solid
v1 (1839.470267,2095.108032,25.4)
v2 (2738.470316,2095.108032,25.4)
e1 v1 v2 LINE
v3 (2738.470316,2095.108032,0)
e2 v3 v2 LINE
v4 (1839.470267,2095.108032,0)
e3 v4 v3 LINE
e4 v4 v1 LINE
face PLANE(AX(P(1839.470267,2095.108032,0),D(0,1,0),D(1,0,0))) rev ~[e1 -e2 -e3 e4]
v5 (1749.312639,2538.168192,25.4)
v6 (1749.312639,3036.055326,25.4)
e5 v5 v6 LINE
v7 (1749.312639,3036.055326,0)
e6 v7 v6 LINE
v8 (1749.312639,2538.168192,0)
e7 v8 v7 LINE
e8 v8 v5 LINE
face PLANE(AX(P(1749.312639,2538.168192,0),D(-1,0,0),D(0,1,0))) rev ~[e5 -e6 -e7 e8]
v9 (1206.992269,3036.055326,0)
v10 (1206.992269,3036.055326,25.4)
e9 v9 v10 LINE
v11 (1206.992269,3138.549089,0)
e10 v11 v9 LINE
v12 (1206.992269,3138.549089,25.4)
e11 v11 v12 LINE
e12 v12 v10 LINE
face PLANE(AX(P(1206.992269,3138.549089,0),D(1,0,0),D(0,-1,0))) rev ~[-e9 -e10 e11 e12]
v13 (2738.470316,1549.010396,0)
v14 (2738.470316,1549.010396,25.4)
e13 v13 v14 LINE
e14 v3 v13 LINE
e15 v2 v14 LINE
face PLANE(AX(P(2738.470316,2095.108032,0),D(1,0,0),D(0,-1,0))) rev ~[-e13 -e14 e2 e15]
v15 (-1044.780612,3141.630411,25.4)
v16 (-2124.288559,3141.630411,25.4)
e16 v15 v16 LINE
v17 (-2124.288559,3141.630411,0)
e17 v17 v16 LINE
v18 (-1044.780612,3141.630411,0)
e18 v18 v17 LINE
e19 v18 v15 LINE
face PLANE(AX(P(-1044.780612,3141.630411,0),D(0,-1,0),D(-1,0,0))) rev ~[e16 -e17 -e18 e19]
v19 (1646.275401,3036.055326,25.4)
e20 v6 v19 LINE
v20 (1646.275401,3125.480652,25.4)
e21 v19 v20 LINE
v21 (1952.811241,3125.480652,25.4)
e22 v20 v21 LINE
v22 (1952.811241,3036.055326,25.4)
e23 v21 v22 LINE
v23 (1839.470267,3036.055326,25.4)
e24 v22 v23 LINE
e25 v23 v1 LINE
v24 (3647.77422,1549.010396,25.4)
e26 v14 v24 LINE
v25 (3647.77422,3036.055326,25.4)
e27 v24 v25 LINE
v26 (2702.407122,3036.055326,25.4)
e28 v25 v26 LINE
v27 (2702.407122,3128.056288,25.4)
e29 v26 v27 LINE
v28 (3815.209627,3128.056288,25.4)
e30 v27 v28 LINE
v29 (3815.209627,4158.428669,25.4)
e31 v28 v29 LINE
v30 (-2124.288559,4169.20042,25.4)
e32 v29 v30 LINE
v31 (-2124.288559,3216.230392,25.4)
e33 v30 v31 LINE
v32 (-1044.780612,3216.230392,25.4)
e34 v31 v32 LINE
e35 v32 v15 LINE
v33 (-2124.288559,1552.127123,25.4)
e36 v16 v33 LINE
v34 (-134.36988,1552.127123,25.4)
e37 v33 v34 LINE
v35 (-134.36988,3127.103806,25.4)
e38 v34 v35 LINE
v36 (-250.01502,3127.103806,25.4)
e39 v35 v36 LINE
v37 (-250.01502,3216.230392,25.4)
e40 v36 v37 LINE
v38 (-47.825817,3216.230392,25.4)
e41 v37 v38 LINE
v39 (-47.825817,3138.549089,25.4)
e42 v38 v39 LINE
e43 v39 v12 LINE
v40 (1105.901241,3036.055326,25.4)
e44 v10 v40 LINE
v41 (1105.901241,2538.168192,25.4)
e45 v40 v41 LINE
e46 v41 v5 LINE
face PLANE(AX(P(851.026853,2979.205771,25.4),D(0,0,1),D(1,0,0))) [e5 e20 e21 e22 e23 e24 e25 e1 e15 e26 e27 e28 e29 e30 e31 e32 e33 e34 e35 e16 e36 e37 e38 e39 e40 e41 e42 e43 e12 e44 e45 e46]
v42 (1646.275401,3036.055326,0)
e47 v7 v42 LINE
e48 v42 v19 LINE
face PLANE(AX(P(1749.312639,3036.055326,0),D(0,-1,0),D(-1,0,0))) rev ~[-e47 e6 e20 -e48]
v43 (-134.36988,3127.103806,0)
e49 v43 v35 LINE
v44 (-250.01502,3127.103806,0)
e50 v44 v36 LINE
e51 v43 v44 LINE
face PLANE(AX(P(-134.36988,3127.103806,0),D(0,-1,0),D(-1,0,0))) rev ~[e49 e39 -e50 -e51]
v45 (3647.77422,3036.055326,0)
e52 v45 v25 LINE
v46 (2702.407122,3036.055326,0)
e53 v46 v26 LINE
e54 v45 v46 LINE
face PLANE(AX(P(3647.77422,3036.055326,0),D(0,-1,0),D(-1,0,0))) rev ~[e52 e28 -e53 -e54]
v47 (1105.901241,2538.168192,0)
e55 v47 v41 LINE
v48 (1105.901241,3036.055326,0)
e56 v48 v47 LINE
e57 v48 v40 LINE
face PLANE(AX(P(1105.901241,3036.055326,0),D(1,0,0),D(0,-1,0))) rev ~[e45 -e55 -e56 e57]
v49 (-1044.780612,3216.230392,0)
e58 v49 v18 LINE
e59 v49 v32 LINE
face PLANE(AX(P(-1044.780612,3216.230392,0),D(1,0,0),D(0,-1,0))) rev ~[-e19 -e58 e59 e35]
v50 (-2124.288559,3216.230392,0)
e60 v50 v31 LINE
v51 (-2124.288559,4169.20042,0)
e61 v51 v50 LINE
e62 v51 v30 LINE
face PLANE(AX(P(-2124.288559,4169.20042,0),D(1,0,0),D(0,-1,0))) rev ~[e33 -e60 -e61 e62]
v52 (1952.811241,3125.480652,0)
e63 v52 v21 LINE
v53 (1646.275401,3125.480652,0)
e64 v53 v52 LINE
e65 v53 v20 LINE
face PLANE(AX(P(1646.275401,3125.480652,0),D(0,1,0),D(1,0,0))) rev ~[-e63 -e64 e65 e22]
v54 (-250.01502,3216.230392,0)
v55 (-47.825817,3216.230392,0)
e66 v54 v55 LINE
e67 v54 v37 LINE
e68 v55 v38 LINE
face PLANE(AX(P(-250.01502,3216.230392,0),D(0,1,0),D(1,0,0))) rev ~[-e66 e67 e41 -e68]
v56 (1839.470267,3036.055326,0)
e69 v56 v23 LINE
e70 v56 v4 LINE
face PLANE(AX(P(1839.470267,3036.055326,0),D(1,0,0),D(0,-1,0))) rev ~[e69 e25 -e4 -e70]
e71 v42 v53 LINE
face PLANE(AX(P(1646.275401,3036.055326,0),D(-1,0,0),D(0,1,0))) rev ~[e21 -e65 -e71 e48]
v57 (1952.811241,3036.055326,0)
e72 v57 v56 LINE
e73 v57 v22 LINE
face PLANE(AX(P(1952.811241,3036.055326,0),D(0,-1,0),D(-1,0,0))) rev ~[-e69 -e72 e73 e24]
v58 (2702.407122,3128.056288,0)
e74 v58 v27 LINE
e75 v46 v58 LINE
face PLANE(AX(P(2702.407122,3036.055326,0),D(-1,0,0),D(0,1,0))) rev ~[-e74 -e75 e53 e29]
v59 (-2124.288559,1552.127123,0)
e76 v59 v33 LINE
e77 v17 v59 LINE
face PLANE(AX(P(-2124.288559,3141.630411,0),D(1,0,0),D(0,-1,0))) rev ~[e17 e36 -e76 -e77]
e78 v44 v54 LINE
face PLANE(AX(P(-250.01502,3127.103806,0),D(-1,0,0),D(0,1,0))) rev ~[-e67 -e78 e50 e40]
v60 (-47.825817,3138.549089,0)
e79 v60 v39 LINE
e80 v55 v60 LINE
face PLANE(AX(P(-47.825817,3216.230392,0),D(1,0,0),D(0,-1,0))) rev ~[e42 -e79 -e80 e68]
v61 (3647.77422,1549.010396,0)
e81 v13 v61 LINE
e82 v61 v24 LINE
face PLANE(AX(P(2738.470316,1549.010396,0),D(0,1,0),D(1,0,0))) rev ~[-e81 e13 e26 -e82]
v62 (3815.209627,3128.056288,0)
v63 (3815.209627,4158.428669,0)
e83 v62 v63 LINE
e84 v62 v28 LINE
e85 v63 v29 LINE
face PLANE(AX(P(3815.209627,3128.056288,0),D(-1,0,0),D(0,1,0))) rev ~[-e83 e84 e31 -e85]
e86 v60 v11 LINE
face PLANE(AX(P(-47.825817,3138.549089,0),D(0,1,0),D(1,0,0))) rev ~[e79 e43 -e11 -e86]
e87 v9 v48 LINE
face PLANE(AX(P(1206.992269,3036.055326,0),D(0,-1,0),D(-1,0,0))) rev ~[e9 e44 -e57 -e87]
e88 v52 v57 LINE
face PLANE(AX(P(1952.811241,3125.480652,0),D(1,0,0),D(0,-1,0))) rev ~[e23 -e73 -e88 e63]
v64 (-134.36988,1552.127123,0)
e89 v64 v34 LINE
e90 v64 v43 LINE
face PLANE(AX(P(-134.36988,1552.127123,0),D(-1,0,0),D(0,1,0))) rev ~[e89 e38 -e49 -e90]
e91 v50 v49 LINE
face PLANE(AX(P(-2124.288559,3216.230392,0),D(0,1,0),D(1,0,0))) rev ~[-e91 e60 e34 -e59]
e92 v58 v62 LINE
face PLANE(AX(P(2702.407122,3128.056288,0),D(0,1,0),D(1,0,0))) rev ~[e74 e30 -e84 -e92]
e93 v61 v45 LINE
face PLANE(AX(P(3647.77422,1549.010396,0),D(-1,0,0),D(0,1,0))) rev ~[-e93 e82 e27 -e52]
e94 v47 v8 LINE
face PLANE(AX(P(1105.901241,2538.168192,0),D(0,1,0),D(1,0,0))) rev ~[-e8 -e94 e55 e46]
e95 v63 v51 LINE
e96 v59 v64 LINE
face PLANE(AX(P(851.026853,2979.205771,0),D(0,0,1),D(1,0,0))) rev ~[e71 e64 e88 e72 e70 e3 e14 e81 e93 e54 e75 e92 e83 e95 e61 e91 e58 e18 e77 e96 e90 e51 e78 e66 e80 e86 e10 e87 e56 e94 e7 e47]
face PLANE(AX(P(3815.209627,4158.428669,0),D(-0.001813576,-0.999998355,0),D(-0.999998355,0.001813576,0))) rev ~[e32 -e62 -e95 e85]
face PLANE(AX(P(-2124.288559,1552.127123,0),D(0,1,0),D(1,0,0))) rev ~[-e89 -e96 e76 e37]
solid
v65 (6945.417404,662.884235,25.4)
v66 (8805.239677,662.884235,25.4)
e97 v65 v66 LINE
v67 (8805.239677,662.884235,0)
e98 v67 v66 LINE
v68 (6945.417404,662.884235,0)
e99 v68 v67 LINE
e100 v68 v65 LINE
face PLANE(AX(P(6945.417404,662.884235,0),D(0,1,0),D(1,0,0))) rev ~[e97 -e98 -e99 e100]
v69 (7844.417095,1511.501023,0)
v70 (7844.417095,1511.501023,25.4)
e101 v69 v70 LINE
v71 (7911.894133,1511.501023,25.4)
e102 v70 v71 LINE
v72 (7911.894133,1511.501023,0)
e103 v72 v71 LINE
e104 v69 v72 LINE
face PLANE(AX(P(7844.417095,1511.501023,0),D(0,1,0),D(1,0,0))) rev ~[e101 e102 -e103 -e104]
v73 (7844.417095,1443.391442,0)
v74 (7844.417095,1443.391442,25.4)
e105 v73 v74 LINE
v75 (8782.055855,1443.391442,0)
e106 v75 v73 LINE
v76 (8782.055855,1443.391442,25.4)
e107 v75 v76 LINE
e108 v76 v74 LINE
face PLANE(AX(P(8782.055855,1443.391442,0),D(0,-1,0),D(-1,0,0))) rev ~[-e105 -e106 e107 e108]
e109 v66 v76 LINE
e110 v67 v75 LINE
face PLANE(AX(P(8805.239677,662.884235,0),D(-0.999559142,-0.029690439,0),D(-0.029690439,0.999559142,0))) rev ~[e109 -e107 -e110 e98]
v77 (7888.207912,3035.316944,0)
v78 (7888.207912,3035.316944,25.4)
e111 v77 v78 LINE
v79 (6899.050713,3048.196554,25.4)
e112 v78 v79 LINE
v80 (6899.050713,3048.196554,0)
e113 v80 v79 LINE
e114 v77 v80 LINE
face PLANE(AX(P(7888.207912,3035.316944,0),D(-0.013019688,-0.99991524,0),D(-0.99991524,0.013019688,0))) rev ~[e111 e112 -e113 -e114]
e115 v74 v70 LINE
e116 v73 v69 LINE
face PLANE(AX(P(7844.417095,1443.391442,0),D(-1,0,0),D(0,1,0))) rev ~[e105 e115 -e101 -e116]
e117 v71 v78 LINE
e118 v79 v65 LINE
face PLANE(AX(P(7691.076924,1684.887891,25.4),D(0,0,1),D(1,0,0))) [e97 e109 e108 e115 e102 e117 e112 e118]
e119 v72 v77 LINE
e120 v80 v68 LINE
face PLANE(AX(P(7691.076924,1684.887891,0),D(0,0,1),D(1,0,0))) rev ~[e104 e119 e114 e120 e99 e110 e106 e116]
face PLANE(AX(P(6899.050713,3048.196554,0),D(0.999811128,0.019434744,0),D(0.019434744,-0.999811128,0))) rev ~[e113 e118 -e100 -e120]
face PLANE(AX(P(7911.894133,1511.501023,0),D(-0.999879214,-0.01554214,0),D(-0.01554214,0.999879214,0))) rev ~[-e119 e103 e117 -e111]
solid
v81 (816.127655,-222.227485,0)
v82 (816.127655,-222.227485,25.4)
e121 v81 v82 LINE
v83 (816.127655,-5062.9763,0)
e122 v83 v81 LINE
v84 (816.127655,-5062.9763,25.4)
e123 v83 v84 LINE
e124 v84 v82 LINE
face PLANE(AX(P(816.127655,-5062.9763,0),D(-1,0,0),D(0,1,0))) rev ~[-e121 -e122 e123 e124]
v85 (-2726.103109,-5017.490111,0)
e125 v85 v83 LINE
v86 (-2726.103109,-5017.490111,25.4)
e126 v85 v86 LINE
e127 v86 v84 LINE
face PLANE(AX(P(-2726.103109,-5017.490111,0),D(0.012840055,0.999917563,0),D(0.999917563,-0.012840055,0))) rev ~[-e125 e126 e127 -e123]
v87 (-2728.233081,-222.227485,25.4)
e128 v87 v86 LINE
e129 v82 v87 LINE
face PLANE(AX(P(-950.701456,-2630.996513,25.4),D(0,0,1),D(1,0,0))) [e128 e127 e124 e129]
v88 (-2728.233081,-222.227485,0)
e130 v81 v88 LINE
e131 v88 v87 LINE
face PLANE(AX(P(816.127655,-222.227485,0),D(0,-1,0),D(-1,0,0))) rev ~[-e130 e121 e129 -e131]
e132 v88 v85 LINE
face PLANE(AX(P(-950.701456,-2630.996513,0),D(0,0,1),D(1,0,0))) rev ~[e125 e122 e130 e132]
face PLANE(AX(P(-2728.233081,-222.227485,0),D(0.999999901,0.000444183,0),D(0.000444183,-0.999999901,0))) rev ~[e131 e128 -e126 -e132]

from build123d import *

# Parameters (mm, degrees)
F1_DEPTH = 25.4
F2_DEPTH = 25.4
F3_DEPTH = 25.4


with BuildPart() as f1:
    # F0 (on Top) → F1 (new body)
    with BuildSketch(Plane.XY):
        Polygon((-2728.2330813421, -222.2274847333), (-2726.1031090565, -5017.4901109881), (816.1276547891, -5062.9762998701), (816.1276547891, -222.2274847333), align=None)
    extrude(amount=F1_DEPTH)


with BuildPart() as f2:
    # F0 (on Top) → F2 (new body)
    with BuildSketch(Plane.XY):
        Polygon((7888.2079124451, 3035.3169441223), (6899.0507125854, 3048.196554184), (6945.4174041748, 662.8842353821), (8805.2396774292, 662.8842353821), (8782.0558547974, 1443.3914422989), (7844.4170951843, 1443.3914422989), (7844.4170951843, 1511.5010225121), (7911.8941330612, 1511.5010225121), align=None)
    extrude(amount=F2_DEPTH)


with BuildPart() as f3:
    # F0 (on Top) → F3 (new body)
    with BuildSketch(Plane.XY):
        Polygon((3815.2096271515, 4158.4286689758), (-2124.28855896, 4169.2004203796), (-2124.28855896, 3216.2303924561), (-1044.7806119919, 3216.2303924561), (-1044.7806119919, 3141.6304111481), (-2124.28855896, 3141.6304111481), (-2124.28855896, 1552.127122879), (-134.369879961, 1552.127122879), (-134.369879961, 3127.103805542), (-250.0150203705, 3127.103805542), (-250.0150203705, 3216.2303924561), (-47.8258170187, 3216.2303924561), (-47.8258170187, 3138.5490894318), (1206.9922685623, 3138.5490894318), (1206.9922685623, 3036.0553264618), (1105.9012413025, 3036.0553264618), (1105.9012413025, 2538.1681919098), (1749.3126392365, 2538.1681919098), (1749.3126392365, 3036.0553264618), (1646.2754011154, 3036.0553264618), (1646.2754011154, 3125.4806518555), (1952.8112411499, 3125.4806518555), (1952.8112411499, 3036.0553264618), (1839.4702672958, 3036.0553264618), (1839.4702672958, 2095.1080322266), (2738.4703159332, 2095.1080322266), (2738.4703159332, 1549.0103960037), (3647.7742195129, 1549.0103960037), (3647.7742195129, 3036.0553264618), (2702.4071216583, 3036.0553264618), (2702.4071216583, 3128.0562877655), (3815.2096271515, 3128.0562877655), align=None)
    extrude(amount=F3_DEPTH)


solid = Compound([f1.part, f2.part, f3.part])
